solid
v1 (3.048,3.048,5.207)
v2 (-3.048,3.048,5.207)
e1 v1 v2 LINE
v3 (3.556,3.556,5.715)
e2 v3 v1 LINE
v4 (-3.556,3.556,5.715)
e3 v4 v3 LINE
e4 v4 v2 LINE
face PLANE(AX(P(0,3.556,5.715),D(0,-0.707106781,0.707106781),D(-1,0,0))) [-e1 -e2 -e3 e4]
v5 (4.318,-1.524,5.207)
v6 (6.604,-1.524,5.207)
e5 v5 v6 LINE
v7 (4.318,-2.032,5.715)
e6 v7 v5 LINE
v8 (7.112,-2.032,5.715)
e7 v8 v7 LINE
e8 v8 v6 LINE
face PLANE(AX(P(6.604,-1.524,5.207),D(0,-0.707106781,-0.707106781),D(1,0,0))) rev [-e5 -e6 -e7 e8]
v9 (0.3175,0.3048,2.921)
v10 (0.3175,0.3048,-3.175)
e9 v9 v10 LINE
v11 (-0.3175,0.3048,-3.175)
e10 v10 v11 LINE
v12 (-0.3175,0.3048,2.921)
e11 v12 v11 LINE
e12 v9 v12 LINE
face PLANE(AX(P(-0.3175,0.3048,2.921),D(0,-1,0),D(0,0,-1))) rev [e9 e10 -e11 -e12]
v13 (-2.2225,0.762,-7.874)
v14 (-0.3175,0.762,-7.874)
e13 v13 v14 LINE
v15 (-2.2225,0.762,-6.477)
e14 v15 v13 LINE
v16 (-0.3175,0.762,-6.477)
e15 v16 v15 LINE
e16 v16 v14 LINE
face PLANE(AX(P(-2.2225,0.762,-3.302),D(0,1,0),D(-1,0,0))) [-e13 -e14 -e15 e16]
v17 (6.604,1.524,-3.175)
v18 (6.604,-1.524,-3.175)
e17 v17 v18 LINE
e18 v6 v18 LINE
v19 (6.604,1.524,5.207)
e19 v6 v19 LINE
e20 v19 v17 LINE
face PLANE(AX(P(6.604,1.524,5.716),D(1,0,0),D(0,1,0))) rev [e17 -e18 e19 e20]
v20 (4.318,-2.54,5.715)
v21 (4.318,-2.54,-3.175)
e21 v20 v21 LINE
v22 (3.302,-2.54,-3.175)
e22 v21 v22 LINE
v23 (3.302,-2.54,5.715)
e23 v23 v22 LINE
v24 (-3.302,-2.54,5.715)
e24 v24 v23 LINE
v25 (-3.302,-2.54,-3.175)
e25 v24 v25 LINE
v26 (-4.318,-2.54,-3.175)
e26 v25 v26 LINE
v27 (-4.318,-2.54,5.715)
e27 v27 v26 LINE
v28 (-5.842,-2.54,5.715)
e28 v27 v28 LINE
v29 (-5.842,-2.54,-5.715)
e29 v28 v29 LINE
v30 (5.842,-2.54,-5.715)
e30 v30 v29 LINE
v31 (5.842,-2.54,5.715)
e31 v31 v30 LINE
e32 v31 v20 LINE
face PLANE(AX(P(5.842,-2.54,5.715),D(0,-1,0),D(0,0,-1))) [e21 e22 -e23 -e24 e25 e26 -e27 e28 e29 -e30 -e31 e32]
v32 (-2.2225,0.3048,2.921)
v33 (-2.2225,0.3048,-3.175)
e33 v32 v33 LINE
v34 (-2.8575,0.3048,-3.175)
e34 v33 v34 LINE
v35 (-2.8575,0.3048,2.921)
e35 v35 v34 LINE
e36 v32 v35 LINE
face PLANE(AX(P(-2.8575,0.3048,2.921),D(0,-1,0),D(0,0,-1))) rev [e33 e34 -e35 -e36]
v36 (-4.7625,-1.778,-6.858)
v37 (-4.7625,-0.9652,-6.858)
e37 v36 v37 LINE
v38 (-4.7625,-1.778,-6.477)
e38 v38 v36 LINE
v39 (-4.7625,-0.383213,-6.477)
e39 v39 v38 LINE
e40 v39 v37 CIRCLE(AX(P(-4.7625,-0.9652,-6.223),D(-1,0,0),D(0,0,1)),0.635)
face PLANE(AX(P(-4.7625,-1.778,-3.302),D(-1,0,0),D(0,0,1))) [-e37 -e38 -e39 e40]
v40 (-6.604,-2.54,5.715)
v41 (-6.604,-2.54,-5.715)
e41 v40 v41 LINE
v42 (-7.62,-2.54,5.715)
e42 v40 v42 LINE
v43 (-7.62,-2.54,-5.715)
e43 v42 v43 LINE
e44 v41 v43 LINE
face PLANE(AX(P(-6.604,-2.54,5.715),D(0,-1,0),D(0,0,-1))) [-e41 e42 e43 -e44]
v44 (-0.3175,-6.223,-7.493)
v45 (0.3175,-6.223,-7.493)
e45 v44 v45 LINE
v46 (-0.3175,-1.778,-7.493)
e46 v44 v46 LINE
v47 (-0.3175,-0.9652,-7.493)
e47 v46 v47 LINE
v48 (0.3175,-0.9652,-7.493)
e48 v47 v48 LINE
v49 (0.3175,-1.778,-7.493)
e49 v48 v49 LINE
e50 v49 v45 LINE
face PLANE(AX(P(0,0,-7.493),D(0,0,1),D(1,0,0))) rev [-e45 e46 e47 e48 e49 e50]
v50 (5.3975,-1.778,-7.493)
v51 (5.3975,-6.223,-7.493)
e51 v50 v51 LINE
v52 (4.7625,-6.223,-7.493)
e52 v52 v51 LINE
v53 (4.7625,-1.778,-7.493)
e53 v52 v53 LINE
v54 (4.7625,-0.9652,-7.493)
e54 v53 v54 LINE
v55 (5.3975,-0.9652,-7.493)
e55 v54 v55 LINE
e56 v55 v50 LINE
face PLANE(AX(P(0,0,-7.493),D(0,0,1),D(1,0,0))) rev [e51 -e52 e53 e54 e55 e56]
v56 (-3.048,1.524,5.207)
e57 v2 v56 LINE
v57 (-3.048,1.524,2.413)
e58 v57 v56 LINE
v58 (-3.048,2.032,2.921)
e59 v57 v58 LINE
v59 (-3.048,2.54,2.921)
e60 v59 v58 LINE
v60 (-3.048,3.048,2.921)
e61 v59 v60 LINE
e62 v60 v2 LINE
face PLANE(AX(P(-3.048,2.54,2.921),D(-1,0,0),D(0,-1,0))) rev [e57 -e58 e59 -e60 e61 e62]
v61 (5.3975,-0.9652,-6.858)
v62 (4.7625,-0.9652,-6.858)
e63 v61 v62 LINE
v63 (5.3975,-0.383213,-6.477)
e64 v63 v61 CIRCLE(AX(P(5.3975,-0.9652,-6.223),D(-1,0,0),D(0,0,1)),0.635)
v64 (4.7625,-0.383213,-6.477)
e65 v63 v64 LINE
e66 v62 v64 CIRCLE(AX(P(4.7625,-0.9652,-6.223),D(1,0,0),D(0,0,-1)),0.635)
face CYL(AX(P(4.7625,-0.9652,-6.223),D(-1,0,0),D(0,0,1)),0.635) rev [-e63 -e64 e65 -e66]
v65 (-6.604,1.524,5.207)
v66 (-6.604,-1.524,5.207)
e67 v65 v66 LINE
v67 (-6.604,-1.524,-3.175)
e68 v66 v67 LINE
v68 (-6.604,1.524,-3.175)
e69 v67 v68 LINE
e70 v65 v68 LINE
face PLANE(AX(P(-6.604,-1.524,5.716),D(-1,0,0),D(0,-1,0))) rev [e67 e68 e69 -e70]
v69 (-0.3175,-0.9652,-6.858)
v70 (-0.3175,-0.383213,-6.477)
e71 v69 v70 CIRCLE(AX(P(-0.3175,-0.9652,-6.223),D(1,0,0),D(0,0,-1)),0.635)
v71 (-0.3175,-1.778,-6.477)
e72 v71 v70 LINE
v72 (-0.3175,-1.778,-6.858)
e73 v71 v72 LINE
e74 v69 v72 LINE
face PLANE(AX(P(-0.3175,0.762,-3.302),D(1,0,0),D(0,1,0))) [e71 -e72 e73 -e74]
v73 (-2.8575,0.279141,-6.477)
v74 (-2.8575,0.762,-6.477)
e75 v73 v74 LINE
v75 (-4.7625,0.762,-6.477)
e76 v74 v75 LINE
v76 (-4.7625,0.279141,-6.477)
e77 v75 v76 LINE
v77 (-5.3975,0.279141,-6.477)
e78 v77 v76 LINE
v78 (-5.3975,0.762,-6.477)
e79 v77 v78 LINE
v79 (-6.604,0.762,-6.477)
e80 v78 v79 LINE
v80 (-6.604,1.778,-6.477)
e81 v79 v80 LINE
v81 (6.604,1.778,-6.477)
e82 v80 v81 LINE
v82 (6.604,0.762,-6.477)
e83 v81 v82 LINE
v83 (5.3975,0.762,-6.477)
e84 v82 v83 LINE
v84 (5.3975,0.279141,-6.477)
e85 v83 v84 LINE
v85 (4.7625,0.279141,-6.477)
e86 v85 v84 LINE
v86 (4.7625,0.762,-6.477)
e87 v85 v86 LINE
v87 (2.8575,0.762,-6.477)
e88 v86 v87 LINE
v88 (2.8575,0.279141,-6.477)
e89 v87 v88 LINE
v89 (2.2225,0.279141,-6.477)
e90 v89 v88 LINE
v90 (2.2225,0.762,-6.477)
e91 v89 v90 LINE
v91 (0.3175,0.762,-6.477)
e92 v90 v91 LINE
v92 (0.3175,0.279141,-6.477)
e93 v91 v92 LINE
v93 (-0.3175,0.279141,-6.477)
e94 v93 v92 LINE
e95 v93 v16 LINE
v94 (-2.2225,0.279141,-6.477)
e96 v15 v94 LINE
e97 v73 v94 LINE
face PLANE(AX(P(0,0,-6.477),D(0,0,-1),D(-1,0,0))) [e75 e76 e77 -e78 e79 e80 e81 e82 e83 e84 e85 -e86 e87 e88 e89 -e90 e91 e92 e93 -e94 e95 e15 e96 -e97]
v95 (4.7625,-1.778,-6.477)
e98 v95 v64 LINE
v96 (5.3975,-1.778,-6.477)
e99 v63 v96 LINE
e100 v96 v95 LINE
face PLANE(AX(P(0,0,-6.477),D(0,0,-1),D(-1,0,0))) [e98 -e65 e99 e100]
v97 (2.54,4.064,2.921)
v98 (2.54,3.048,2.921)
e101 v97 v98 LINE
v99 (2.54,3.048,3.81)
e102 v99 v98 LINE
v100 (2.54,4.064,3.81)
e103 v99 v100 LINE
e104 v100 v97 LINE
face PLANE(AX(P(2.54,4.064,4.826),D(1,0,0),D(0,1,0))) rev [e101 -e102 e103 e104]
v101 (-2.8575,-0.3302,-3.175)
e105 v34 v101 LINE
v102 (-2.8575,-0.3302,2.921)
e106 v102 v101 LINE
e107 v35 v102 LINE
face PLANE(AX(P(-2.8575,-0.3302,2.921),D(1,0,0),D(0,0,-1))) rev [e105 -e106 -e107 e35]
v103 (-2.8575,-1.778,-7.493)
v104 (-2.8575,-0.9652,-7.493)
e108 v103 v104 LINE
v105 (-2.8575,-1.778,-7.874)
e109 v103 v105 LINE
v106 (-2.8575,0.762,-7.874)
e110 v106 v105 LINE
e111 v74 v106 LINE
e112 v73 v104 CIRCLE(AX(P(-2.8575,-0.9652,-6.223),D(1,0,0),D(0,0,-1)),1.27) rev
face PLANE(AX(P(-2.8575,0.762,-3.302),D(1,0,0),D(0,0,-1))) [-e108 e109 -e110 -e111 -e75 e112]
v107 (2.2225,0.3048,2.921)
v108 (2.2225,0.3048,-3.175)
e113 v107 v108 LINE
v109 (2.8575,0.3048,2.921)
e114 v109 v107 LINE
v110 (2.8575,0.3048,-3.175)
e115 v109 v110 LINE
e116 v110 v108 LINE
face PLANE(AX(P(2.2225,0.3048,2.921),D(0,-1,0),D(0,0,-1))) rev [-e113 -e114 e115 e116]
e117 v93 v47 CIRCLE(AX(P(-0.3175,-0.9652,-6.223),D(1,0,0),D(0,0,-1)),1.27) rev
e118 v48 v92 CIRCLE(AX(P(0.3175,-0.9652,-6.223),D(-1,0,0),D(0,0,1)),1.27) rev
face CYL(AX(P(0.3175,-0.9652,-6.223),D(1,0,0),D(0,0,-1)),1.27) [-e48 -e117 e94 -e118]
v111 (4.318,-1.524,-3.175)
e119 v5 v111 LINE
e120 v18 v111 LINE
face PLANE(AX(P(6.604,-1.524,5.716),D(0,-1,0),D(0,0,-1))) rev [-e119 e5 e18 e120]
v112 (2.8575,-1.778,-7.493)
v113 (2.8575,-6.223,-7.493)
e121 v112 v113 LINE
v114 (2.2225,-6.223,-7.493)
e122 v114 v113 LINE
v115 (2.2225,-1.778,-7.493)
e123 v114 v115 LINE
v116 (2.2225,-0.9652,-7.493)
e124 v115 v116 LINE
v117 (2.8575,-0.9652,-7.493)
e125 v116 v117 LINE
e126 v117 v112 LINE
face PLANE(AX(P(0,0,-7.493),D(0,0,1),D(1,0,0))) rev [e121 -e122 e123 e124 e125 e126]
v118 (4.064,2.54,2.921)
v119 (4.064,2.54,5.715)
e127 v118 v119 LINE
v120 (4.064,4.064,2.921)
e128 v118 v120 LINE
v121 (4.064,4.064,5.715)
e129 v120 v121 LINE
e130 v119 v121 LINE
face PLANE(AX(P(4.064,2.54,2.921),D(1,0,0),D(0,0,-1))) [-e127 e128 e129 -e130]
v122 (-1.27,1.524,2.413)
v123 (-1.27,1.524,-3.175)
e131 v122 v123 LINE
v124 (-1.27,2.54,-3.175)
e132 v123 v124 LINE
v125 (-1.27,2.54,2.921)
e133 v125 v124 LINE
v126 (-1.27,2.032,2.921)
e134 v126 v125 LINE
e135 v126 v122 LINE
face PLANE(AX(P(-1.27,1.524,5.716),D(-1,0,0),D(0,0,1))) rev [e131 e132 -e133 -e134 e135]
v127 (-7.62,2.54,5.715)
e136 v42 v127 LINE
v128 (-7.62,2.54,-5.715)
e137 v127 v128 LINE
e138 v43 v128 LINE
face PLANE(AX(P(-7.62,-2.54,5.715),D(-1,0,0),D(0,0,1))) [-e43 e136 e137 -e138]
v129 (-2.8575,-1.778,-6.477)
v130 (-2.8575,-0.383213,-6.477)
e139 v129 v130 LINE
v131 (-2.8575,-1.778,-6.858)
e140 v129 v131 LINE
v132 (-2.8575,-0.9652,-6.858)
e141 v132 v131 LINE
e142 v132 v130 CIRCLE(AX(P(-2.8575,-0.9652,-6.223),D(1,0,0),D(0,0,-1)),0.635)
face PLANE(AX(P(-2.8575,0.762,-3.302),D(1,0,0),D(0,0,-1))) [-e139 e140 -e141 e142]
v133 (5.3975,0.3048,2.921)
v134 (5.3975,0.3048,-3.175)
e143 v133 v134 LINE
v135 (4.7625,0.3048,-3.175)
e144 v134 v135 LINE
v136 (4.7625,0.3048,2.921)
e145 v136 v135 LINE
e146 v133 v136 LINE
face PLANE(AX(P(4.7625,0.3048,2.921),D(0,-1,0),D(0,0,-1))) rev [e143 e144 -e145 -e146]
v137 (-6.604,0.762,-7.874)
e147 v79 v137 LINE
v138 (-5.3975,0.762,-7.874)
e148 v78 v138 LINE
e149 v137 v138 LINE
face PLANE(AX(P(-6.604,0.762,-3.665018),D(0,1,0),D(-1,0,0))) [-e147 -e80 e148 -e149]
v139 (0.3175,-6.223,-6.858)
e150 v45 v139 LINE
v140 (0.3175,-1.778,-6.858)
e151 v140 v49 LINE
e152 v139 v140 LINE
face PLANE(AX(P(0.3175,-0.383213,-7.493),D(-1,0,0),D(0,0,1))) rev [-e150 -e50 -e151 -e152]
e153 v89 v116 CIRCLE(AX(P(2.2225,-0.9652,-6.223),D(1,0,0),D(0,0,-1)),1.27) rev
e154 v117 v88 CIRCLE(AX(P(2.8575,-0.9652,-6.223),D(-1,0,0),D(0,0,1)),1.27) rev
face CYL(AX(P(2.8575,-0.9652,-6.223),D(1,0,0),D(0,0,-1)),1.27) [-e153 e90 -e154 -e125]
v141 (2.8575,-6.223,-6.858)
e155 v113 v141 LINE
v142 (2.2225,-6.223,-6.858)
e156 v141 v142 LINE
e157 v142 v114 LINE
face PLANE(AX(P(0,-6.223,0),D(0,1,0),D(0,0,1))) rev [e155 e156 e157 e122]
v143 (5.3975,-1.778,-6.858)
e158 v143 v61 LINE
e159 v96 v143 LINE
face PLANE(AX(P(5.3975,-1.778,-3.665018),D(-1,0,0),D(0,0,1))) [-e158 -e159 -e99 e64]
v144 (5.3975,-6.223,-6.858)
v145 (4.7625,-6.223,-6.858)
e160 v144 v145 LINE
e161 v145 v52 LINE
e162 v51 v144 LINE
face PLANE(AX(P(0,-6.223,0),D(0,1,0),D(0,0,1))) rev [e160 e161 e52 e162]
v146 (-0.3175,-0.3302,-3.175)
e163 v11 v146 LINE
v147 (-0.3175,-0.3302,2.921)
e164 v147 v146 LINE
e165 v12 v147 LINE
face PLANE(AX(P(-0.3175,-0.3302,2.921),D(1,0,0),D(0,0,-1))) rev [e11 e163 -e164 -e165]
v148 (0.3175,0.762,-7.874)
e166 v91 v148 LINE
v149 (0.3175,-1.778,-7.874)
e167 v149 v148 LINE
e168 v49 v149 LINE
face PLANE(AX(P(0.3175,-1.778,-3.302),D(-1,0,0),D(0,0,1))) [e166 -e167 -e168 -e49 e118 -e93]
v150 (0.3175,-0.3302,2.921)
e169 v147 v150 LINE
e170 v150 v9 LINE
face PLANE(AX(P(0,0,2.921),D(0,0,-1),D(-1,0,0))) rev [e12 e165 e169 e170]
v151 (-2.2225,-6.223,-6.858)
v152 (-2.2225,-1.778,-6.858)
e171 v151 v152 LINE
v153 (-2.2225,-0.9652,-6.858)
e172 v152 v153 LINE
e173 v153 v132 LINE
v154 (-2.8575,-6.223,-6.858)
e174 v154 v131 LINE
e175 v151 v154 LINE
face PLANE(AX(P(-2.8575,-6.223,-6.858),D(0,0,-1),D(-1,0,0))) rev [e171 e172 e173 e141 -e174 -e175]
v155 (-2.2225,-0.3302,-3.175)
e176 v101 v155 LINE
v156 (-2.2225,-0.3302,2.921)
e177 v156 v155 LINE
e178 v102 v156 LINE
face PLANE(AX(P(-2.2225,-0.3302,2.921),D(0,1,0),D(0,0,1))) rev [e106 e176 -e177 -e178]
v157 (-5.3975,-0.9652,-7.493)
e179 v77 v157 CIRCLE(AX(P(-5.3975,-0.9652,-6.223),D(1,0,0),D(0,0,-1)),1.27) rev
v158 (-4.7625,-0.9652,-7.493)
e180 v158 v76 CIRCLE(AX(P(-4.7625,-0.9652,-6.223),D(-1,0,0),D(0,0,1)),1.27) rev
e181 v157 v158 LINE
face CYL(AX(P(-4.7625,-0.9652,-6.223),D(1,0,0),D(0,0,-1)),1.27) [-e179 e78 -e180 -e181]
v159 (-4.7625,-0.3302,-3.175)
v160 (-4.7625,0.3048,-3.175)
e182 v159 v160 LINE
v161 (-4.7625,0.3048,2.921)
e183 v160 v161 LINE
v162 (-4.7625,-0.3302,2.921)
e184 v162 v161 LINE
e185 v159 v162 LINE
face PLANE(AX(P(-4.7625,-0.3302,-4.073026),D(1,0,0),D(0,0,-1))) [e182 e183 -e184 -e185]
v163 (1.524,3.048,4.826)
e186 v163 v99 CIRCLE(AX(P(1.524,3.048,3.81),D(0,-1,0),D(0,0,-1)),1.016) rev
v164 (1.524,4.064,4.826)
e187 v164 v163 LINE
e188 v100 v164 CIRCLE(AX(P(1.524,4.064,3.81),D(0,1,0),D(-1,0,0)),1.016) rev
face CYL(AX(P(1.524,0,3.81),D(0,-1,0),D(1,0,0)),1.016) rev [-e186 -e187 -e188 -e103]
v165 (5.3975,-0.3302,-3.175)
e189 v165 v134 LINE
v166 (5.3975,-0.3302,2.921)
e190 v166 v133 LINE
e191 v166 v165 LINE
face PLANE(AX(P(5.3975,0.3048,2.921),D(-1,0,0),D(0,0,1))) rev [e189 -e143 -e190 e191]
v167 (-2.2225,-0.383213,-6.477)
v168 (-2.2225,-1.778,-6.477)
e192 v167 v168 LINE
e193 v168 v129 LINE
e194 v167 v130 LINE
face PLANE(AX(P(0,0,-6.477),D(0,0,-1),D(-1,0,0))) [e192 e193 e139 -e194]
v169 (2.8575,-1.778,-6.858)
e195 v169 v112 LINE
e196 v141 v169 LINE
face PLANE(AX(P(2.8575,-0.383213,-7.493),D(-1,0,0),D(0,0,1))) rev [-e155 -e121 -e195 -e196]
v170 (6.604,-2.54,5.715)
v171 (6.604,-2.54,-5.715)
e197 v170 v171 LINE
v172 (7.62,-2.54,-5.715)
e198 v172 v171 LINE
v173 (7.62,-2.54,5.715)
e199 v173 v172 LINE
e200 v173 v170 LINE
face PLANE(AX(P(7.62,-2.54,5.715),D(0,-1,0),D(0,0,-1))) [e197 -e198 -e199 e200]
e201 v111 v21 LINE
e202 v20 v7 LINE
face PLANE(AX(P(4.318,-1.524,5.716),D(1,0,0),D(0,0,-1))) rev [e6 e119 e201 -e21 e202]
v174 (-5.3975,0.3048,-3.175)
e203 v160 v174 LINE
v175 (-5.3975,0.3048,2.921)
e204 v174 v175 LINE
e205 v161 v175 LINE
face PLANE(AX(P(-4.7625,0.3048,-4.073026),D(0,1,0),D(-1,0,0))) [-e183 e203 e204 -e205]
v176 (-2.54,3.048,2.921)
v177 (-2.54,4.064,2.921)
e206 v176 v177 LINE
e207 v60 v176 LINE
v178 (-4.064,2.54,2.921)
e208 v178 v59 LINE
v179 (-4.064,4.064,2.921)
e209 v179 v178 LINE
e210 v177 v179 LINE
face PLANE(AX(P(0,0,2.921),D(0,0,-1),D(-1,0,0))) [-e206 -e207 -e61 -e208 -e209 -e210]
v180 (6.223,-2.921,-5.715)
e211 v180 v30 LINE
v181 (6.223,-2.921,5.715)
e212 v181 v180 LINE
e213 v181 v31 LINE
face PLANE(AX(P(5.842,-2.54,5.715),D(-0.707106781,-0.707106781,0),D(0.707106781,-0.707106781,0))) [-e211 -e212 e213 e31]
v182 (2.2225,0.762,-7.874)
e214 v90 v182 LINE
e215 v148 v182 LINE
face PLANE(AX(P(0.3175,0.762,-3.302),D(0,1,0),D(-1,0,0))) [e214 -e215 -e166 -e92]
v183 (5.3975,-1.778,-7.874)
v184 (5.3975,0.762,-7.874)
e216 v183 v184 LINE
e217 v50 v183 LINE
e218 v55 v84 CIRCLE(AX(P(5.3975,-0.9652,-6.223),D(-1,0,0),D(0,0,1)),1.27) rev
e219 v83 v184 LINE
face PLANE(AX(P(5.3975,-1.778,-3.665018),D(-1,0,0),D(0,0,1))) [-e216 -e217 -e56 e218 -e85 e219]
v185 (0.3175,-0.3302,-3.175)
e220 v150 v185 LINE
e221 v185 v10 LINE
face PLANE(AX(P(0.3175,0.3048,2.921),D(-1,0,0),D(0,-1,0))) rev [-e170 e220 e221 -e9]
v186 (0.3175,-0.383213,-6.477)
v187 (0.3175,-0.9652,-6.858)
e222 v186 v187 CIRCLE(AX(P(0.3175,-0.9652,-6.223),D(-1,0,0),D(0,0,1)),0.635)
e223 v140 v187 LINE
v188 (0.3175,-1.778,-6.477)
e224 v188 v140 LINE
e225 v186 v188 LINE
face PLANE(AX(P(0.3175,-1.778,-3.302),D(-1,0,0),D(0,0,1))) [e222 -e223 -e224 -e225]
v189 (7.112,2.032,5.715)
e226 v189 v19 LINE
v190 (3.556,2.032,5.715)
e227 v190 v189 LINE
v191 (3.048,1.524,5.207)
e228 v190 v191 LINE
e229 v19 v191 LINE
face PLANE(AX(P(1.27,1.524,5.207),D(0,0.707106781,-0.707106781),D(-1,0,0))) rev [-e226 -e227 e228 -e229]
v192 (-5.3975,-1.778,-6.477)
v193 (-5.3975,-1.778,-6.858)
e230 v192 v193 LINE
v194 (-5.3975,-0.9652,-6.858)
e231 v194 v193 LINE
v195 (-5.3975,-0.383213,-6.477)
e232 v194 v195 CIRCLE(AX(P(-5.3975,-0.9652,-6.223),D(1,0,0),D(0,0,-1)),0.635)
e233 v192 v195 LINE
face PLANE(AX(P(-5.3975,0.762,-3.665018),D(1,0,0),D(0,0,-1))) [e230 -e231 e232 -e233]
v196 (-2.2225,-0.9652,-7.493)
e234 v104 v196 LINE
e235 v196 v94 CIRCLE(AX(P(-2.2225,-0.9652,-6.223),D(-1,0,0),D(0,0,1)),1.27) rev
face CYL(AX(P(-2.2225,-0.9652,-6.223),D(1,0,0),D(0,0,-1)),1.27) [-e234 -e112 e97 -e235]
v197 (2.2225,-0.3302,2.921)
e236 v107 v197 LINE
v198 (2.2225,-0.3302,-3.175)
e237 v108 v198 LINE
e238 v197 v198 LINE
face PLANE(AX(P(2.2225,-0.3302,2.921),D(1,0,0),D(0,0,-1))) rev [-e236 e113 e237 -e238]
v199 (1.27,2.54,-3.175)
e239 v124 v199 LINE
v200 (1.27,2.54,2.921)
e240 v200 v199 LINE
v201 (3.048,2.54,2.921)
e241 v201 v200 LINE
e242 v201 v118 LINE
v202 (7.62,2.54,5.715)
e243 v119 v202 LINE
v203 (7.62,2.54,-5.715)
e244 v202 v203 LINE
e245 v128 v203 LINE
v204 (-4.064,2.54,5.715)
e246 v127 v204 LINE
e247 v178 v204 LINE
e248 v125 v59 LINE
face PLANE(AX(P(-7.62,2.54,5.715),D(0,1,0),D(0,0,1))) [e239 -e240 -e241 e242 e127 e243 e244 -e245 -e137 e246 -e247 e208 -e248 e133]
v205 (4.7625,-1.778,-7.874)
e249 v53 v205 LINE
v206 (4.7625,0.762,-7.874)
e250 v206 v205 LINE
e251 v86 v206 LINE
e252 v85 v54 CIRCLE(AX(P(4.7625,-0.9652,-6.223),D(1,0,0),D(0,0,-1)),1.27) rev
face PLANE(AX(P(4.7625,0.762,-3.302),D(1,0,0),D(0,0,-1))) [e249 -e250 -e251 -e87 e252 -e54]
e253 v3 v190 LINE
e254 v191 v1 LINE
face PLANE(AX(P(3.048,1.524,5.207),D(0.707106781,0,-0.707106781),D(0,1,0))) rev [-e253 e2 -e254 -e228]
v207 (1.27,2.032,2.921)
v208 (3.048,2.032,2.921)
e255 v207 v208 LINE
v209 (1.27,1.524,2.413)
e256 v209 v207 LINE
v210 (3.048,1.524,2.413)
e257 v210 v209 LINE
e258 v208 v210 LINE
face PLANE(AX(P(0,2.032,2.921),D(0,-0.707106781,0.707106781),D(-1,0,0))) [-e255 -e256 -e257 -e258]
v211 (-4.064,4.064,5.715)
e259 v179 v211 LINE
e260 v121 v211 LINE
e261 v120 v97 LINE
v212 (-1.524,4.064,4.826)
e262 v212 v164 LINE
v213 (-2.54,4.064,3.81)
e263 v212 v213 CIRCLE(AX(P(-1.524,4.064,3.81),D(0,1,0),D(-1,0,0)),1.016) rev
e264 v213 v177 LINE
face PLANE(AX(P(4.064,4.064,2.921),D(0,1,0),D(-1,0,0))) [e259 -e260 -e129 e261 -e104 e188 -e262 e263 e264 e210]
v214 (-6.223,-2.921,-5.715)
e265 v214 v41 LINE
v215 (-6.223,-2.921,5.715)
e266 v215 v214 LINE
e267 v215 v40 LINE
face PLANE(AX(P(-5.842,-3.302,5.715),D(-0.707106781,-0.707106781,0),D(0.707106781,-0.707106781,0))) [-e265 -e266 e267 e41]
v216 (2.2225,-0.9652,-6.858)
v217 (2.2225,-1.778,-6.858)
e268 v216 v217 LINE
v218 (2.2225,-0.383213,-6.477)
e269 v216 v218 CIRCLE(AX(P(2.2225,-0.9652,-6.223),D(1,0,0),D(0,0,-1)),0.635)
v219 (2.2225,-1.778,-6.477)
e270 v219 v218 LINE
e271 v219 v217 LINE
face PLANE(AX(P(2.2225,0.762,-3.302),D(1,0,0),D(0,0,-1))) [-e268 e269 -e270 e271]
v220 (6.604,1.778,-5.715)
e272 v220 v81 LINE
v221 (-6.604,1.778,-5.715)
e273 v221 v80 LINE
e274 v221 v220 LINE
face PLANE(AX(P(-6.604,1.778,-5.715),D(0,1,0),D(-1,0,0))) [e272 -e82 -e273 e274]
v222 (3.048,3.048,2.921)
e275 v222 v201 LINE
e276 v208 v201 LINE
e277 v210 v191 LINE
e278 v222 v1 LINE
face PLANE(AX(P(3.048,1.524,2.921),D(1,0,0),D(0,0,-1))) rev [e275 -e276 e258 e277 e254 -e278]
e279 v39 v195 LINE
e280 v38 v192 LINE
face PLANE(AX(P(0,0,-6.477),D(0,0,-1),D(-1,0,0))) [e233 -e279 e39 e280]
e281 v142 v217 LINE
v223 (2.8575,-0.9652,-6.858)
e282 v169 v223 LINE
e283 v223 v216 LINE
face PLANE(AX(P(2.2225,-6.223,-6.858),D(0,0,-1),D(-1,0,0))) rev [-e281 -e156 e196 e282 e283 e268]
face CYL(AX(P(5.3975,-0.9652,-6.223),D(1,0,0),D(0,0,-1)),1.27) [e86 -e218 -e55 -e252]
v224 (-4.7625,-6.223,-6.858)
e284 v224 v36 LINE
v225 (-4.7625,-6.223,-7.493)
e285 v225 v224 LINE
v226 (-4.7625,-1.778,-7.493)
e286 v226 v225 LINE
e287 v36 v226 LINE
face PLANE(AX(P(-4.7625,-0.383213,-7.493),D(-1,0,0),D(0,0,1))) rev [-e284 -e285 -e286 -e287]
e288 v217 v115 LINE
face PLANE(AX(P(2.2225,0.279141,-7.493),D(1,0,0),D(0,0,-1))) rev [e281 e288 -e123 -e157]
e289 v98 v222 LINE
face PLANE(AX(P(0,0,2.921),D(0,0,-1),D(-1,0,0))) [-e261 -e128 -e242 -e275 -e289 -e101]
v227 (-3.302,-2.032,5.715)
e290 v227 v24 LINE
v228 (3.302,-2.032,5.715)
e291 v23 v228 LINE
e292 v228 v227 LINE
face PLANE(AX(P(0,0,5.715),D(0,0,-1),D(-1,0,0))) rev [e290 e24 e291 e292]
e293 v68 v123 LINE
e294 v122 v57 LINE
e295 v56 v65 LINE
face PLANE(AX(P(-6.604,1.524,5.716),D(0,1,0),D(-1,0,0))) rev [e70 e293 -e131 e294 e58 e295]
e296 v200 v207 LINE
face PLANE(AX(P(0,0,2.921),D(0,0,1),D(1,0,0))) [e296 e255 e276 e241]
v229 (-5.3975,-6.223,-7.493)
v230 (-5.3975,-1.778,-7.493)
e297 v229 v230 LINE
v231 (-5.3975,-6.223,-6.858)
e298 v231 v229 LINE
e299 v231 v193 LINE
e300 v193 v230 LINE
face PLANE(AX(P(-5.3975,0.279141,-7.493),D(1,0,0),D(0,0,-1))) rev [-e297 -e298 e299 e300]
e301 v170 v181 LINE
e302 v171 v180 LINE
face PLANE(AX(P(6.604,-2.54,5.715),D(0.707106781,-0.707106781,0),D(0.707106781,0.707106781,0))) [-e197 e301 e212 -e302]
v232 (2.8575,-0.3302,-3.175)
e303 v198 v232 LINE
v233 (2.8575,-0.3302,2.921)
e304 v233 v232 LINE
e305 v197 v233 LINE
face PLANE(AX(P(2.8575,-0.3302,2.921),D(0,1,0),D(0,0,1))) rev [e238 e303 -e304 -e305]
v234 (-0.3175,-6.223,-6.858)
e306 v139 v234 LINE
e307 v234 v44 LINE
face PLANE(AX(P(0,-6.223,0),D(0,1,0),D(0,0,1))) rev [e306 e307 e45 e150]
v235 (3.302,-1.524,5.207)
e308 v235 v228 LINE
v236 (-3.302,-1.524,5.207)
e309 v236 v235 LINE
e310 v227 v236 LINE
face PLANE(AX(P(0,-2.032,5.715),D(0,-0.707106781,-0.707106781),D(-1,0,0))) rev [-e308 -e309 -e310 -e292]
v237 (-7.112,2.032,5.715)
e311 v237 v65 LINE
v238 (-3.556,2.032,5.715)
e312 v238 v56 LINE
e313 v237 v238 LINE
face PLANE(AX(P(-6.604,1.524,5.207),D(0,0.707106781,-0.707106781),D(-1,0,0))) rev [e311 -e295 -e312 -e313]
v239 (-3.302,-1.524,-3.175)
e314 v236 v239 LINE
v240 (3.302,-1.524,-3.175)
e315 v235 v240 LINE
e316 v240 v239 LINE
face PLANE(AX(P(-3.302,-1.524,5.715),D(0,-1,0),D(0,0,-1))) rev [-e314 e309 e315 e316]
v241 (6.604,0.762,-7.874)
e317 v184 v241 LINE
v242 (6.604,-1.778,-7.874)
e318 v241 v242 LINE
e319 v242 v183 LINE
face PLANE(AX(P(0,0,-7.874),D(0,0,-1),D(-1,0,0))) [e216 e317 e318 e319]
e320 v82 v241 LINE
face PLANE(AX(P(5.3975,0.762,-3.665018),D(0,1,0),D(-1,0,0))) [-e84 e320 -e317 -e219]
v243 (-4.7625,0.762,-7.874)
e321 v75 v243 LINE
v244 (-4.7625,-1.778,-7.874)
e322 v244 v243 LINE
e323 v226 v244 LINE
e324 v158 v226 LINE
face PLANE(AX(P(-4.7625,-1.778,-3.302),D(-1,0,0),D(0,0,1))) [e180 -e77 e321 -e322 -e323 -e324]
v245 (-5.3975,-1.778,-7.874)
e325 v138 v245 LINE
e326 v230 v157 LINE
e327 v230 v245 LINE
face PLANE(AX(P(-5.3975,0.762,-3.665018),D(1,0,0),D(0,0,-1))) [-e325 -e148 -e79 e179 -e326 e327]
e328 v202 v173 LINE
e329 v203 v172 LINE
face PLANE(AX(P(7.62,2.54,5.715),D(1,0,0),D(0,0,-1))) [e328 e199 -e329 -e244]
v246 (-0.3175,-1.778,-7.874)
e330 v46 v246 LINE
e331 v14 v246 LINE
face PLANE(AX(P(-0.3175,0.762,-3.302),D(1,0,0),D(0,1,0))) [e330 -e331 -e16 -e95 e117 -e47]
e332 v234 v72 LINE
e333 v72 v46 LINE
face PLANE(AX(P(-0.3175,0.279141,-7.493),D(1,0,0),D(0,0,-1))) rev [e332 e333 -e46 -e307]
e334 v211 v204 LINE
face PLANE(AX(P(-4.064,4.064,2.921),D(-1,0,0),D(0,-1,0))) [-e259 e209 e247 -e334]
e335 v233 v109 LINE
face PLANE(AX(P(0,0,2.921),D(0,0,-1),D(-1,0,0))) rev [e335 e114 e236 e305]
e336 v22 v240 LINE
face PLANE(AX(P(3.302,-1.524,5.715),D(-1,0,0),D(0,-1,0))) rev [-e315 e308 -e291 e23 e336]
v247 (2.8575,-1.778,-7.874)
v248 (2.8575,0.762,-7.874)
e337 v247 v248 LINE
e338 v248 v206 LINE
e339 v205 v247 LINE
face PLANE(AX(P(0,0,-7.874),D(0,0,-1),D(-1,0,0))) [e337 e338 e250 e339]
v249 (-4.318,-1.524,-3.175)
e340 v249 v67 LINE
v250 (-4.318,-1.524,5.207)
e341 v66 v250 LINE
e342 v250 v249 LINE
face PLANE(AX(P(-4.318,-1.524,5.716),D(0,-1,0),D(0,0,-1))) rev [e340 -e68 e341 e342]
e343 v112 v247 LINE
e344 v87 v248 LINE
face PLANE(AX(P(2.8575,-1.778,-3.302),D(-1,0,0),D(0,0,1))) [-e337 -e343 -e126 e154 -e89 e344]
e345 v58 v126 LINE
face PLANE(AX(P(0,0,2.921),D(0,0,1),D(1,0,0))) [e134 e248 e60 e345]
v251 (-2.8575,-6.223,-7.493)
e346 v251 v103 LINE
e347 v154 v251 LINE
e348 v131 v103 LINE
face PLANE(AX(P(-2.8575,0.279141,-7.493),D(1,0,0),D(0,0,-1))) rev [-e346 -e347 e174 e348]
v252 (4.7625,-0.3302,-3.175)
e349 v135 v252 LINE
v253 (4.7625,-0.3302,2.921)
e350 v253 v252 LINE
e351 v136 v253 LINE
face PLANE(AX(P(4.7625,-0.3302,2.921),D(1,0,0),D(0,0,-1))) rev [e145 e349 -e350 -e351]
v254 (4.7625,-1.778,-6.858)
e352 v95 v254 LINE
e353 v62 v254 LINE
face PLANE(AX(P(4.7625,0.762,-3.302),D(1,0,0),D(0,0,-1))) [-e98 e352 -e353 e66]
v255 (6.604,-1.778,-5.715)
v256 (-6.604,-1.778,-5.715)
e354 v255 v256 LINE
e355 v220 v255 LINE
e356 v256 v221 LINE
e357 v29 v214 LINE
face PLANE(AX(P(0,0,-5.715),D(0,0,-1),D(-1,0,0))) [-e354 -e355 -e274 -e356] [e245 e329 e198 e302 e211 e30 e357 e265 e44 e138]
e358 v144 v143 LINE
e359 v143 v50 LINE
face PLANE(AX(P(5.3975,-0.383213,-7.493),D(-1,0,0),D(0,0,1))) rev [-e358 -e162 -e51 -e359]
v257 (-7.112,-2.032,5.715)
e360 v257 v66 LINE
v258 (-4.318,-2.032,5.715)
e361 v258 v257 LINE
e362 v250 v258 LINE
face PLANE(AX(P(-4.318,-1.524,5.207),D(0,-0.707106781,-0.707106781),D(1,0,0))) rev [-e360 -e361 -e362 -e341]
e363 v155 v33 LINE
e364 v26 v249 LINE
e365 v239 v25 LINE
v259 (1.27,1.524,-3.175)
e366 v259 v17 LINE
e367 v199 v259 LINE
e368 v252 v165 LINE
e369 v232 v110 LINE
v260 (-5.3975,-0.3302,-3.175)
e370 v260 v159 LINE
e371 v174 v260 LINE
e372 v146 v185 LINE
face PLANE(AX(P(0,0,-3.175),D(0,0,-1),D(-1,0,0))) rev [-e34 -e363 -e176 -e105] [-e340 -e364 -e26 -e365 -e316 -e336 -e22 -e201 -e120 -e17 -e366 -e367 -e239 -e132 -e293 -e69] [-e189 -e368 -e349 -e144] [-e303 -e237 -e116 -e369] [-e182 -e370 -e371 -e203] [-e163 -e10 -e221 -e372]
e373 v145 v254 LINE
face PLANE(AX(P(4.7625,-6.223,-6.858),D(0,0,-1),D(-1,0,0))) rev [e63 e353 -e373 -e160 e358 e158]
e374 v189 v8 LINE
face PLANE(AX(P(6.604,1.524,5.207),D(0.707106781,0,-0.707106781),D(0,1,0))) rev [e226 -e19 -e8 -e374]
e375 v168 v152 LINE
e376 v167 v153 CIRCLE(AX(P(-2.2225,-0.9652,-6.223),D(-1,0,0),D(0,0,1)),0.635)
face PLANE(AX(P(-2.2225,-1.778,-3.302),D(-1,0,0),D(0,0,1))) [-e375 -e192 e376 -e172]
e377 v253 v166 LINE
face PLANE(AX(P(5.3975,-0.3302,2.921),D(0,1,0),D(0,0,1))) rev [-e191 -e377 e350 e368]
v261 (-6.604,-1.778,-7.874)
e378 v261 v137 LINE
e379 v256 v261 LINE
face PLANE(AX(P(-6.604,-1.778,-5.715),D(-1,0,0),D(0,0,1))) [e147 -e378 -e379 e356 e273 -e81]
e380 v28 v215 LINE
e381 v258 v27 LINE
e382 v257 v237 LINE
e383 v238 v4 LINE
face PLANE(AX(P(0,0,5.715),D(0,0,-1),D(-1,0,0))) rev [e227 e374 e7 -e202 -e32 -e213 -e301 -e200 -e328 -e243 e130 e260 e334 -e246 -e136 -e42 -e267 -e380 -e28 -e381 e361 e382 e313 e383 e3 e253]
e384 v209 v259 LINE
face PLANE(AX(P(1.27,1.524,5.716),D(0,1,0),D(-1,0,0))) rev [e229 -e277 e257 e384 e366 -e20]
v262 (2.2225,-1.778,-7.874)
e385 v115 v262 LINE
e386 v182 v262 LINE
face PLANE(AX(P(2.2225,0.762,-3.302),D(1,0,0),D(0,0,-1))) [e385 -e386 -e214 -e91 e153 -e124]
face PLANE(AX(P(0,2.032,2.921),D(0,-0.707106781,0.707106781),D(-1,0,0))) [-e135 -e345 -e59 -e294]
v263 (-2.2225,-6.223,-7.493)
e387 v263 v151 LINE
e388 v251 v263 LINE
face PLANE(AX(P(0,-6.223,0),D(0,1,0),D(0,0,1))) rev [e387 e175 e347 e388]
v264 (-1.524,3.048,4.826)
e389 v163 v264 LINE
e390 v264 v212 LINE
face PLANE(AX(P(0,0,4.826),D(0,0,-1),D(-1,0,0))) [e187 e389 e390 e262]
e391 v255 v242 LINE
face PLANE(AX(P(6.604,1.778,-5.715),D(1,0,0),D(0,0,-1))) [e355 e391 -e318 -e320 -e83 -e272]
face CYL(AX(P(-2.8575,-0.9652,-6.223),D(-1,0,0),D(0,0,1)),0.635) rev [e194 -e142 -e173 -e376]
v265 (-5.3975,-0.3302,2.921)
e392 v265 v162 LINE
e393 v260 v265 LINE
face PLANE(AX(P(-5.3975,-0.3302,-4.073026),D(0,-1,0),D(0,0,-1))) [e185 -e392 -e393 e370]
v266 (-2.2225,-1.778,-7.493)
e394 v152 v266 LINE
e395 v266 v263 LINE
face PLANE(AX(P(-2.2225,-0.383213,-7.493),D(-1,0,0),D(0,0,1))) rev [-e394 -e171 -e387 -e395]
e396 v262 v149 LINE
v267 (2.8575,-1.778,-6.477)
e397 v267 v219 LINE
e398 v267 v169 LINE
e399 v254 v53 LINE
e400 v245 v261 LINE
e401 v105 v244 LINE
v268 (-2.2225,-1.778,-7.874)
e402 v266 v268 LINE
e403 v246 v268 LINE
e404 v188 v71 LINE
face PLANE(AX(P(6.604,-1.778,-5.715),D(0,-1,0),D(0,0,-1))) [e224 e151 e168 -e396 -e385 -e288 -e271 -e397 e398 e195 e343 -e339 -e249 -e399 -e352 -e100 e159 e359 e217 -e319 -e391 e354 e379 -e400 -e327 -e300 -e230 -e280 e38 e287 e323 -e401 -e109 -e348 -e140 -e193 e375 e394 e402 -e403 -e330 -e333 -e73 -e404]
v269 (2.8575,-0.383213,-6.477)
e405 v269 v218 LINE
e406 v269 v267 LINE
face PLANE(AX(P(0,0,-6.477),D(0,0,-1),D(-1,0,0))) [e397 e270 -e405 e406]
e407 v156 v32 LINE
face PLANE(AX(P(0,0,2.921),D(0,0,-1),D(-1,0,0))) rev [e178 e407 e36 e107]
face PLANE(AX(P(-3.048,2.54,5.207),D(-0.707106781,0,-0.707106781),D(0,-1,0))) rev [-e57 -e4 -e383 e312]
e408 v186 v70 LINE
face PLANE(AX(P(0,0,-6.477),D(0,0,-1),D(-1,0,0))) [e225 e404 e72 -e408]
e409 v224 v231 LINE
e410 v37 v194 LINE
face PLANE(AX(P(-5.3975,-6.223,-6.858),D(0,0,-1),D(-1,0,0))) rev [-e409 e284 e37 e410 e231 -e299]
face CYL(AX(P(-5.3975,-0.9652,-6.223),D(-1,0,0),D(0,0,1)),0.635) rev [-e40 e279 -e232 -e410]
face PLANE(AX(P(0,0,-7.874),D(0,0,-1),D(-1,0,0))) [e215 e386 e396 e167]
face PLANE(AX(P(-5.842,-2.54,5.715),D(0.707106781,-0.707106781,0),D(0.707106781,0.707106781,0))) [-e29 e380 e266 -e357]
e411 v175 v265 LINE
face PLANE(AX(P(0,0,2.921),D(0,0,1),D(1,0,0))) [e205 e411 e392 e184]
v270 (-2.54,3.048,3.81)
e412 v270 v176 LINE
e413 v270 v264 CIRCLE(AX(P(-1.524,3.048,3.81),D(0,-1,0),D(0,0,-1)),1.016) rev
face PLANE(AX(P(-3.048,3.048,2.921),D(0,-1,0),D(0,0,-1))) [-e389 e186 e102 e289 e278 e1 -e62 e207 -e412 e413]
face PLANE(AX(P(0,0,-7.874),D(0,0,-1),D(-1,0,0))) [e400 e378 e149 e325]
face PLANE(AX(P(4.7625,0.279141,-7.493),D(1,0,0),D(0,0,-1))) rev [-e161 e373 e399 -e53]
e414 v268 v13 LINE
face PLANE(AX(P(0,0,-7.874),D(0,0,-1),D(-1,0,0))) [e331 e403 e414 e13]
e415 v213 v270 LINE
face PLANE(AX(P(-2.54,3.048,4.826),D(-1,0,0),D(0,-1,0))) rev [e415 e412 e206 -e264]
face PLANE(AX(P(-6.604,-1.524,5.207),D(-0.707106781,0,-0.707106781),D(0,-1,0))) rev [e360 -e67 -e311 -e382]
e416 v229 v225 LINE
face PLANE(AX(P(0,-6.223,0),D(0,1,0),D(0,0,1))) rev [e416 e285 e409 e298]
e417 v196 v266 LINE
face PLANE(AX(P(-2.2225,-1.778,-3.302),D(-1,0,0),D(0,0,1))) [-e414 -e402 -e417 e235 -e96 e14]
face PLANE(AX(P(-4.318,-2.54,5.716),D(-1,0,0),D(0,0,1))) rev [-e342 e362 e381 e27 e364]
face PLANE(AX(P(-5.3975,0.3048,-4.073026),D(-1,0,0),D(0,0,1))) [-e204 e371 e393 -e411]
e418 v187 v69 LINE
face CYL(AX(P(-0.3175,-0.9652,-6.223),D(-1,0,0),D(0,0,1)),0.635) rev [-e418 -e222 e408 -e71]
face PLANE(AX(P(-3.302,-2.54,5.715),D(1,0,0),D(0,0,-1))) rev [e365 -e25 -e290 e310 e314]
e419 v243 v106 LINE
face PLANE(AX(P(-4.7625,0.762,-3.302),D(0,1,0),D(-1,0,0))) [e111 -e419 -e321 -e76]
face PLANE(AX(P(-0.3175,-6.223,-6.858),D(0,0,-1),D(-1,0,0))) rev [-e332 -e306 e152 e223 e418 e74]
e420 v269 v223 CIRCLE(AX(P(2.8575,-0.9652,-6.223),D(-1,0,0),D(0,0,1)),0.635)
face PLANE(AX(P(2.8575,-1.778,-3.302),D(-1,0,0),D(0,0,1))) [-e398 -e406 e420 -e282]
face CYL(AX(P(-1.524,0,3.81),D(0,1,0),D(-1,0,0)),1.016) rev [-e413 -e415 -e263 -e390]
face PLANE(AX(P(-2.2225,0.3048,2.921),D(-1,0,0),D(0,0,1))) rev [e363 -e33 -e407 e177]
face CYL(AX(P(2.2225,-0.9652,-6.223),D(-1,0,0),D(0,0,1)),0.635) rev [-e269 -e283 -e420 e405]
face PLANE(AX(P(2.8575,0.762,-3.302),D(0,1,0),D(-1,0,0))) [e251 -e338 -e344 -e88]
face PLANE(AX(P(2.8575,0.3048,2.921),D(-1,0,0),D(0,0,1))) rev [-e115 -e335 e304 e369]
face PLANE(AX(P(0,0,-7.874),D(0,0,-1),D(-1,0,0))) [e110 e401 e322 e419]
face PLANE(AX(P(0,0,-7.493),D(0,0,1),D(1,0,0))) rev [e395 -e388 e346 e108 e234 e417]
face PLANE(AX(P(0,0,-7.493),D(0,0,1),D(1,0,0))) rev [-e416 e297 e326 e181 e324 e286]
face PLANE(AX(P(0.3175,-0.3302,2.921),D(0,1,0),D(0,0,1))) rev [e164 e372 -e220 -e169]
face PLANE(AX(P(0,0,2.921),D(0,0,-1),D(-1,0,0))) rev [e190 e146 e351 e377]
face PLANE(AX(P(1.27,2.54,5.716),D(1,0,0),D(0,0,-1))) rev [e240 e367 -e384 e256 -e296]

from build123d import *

# Parameters (mm, degrees)
SKETCH1_W            = 13.208
SKETCH1_H            = 3.556
BOSS_EXTRUDE1_DEPTH  = 0.762
SKETCH2_W            = 0.635
SKETCH2_H            = 0.662353677
BOSS_EXTRUDE2_DEPTH  = 1.016
SKETCH3_W            = 0.635
SKETCH3_H            = 0.662353677
BOSS_EXTRUDE3_DEPTH  = 1.016
SKETCH4_W            = 0.635
SKETCH4_H            = 0.662353677
BOSS_EXTRUDE4_DEPTH  = 1.016
SKETCH5_W            = 0.635
SKETCH5_H            = 0.662353677
BOSS_EXTRUDE5_DEPTH  = 1.016
SKETCH6_W            = 0.635
SKETCH6_H            = 0.662353677
BOSS_EXTRUDE6_DEPTH  = 1.016
SKETCH7_W            = 0.635
SKETCH7_H            = 0.635
BOSS_EXTRUDE7_DEPTH  = 5.839787113
SKETCH8_W            = 0.635
SKETCH8_H            = 0.635
BOSS_EXTRUDE8_DEPTH  = 5.839787113
SKETCH9_W            = 0.635
SKETCH9_H            = 0.635
BOSS_EXTRUDE9_DEPTH  = 5.839787113
SKETCH10_W           = 0.635
SKETCH10_H           = 0.635
BOSS_EXTRUDE10_DEPTH = 5.839787113
SKETCH11_W           = 0.635
SKETCH11_H           = 0.635
BOSS_EXTRUDE11_DEPTH = 5.839787113
BOSS_EXTRUDE12_DEPTH = 11.43
CUT_EXTRUDE1_REACH   = 15.26
SKETCH14_W           = 1.778
SKETCH14_H           = 1.016
CUT_EXTRUDE2_DEPTH   = 2.793999999
SKETCH15_W           = 1.778
SKETCH15_H           = 1.016
CUT_EXTRUDE3_DEPTH   = 2.794
BOSS_EXTRUDE13_DEPTH = 2.794
SKETCH17_W           = 6.604
SKETCH17_H           = 1.016
BOSS_EXTRUDE14_DEPTH = 8.89
SKETCH18_W           = 5.08
SKETCH18_H           = 1.016
CUT_EXTRUDE4_DEPTH   = 1.905
CHAMFER1_SIZE        = 0.508
CHAMFER2_SIZE        = 0.508
CHAMFER3_SIZE        = 0.508
DRAFT1_ANGLE         = 45
CHAMFER4_SIZE        = 0.508
SKETCH19_W           = 0.635
SKETCH19_H           = 0.635
BOSS_EXTRUDE15_DEPTH = 6.096
SKETCH20_W           = 0.635
SKETCH20_H           = 0.635
BOSS_EXTRUDE16_DEPTH = 6.096
SKETCH21_W           = 0.635
SKETCH21_H           = 0.635
BOSS_EXTRUDE17_DEPTH = 6.096
SKETCH22_W           = 0.635
SKETCH22_H           = 0.635
BOSS_EXTRUDE18_DEPTH = 6.096
SKETCH23_W           = 0.635
SKETCH23_H           = 0.635
BOSS_EXTRUDE19_DEPTH = 6.096
FILLET1_R            = 0.635
FILLET2_R            = 0.635
FILLET3_R            = 0.635
FILLET4_R            = 0.635
FILLET5_R            = 0.635
FILLET6_R            = 1.27
FILLET7_R            = 1.27
FILLET8_R            = 1.27
FILLET9_R            = 1.27
FILLET10_R           = 1.27
SKETCH24_W           = 1.905
SKETCH24_H           = 2.54
BOSS_EXTRUDE20_DEPTH = 1.397
SKETCH25_W           = 1.905
SKETCH25_H           = 2.54
BOSS_EXTRUDE21_DEPTH = 1.397
SKETCH26_W           = 1.905
SKETCH26_H           = 2.54
BOSS_EXTRUDE22_DEPTH = 1.397
SKETCH27_W           = 1.2065
SKETCH27_H           = 2.54
BOSS_EXTRUDE23_DEPTH = 1.397
SKETCH28_W           = 1.905
SKETCH28_H           = 2.54
BOSS_EXTRUDE24_DEPTH = 1.397
SKETCH29_W           = 1.2065
SKETCH29_H           = 2.54
BOSS_EXTRUDE25_DEPTH = 1.397
FILLET11_R           = 1.016
FILLET12_R           = 1.016


with BuildPart() as part:
    # Sketch1 → Boss-Extrude1 (new body)
    with BuildSketch(Plane(origin=(0, 0, -6.477), x_dir=(-1, 0, 0), z_dir=(0, 0, -1))):
        Rectangle(SKETCH1_W, SKETCH1_H)
    extrude(amount=-BOSS_EXTRUDE1_DEPTH)

    # Sketch2 → Boss-Extrude2 (add)
    with BuildSketch(Plane(origin=(0, 0, -6.477), x_dir=(-1, 0, 0), z_dir=(0, 0, -1))):
        with Locations((5.08, -0.052036048)):
            Rectangle(SKETCH2_W, SKETCH2_H)
    extrude(amount=BOSS_EXTRUDE2_DEPTH)

    # Sketch3 → Boss-Extrude3 (add)
    with BuildSketch(Plane(origin=(0, 0, -6.477), x_dir=(-1, 0, 0), z_dir=(0, 0, -1))):
        with Locations((2.54, -0.052036048)):
            Rectangle(SKETCH3_W, SKETCH3_H)
    extrude(amount=BOSS_EXTRUDE3_DEPTH)

    # Sketch4 → Boss-Extrude4 (add)
    with BuildSketch(Plane(origin=(0, 0, -6.477), x_dir=(-1, 0, 0), z_dir=(0, 0, -1))):
        with Locations((0, -0.052036048)):
            Rectangle(SKETCH4_W, SKETCH4_H)
    extrude(amount=BOSS_EXTRUDE4_DEPTH)

    # Sketch5 → Boss-Extrude5 (add)
    with BuildSketch(Plane(origin=(0, 0, -6.477), x_dir=(-1, 0, 0), z_dir=(0, 0, -1))):
        with Locations((-2.54, -0.052036048)):
            Rectangle(SKETCH5_W, SKETCH5_H)
    extrude(amount=BOSS_EXTRUDE5_DEPTH)

    # Sketch6 → Boss-Extrude6 (add)
    with BuildSketch(Plane(origin=(0, 0, -6.477), x_dir=(-1, 0, 0), z_dir=(0, 0, -1))):
        with Locations((-5.08, -0.052036048)):
            Rectangle(SKETCH6_W, SKETCH6_H)
    extrude(amount=BOSS_EXTRUDE6_DEPTH)

    # Sketch7 → Boss-Extrude7 (add)
    with BuildSketch(Plane.XZ.offset(0.383212887)):
        with Locations((5.08, -7.1755)):
            Rectangle(SKETCH7_W, SKETCH7_H)
    extrude(amount=BOSS_EXTRUDE7_DEPTH)

    # Sketch8 → Boss-Extrude8 (add)
    with BuildSketch(Plane.XZ.offset(0.383212887)):
        with Locations((2.54, -7.1755)):
            Rectangle(SKETCH8_W, SKETCH8_H)
    extrude(amount=BOSS_EXTRUDE8_DEPTH)

    # Sketch9 → Boss-Extrude9 (add)
    with BuildSketch(Plane.XZ.offset(0.383212887)):
        with Locations((0, -7.1755)):
            Rectangle(SKETCH9_W, SKETCH9_H)
    extrude(amount=BOSS_EXTRUDE9_DEPTH)

    # Sketch10 → Boss-Extrude10 (add)
    with BuildSketch(Plane.XZ.offset(0.383212887)):
        with Locations((-2.54, -7.1755)):
            Rectangle(SKETCH10_W, SKETCH10_H)
    extrude(amount=BOSS_EXTRUDE10_DEPTH)

    # Sketch11 → Boss-Extrude11 (add)
    with BuildSketch(Plane.XZ.offset(0.383212887)):
        with Locations((-5.08, -7.1755)):
            Rectangle(SKETCH11_W, SKETCH11_H)
    extrude(amount=BOSS_EXTRUDE11_DEPTH)

    # Sketch12 → Boss-Extrude12 (add)
    with BuildSketch(Plane(origin=(0, 0, -5.715), x_dir=(-1, 0, 0), z_dir=(0, 0, -1))):
        Polygon((7.62, 2.54), (-7.62, 2.54), (-7.62, -2.54), (-6.604, -2.54), (-5.842, -3.302), (-5.842, -2.54), (5.842, -2.54), (5.842, -3.302), (6.604, -2.54), (7.62, -2.54), align=None)
    extrude(amount=-BOSS_EXTRUDE12_DEPTH)

    # Sketch13 → Cut-Extrude1 (cut, up to next)
    with BuildSketch(Plane(origin=(0, 0, -3.175), x_dir=(-1, 0, 0), z_dir=(0, 0, -1)), mode=Mode.PRIVATE) as cut_extrude1_sk1:
        Polygon((-4.318, -2.54), (4.318, -2.54), (4.318, -1.524), (6.604, -1.524), (6.604, 1.524), (1.27, 1.524), (1.27, 2.54), (-1.27, 2.54), (-1.27, 1.524), (-6.604, 1.524), (-6.604, -1.524), (-4.318, -1.524), align=None)
    cut_extrude1_tool1 = extrude(cut_extrude1_sk1.sketch, amount=-CUT_EXTRUDE1_REACH, mode=Mode.PRIVATE) & part.part
    add(cut_extrude1_tool1.solids().sort_by_distance((0, -0.24384, -3.175))[0], mode=Mode.SUBTRACT)

    # Sketch14 → Cut-Extrude2 (cut)
    with BuildSketch(Plane.XY.offset(5.715)):
        with Locations((2.159, 2.032)):
            Rectangle(SKETCH14_W, SKETCH14_H)
    extrude(amount=-CUT_EXTRUDE2_DEPTH, mode=Mode.SUBTRACT)

    # Sketch15 → Cut-Extrude3 (cut)
    with BuildSketch(Plane.XY.offset(5.715)):
        with Locations((-2.159, 2.032)):
            Rectangle(SKETCH15_W, SKETCH15_H)
    extrude(amount=-CUT_EXTRUDE3_DEPTH, mode=Mode.SUBTRACT)

    # Sketch16 → Boss-Extrude13 (add)
    with BuildSketch(Plane.XY.offset(5.715)):
        Polygon((-3.048, 3.048), (3.048, 3.048), (3.048, 2.54), (4.064, 2.54), (4.064, 4.064), (-4.064, 4.064), (-4.064, 2.54), (-3.048, 2.54), align=None)
    extrude(amount=-BOSS_EXTRUDE13_DEPTH)

    # Sketch17 → Boss-Extrude14 (add)
    with BuildSketch(Plane.XY.offset(-3.175)):
        with Locations((0, -2.032)):
            Rectangle(SKETCH17_W, SKETCH17_H)
    extrude(amount=BOSS_EXTRUDE14_DEPTH)

    # Sketch18 → Cut-Extrude4 (cut)
    with BuildSketch(Plane(origin=(0, 0, 2.921), x_dir=(-1, 0, 0), z_dir=(0, 0, -1))):
        with Locations((0, 3.556)):
            Rectangle(SKETCH18_W, SKETCH18_H)
    extrude(amount=-CUT_EXTRUDE4_DEPTH, mode=Mode.SUBTRACT)

    # Chamfer1
    chamfer1_edges = [part.edges().sort_by_distance(p)[0] for p in [
        (2.159, 1.524, 2.921000001),
    ]]
    chamfer(chamfer1_edges, length=CHAMFER1_SIZE)

    # Chamfer2
    chamfer2_edges = [part.edges().sort_by_distance(p)[0] for p in [
        (-2.159, 1.524, 2.921),
    ]]
    chamfer(chamfer2_edges, length=CHAMFER2_SIZE)

    # Chamfer3
    chamfer3_edges = [part.edges().sort_by_distance(p)[0] for p in [
        (0, -1.524, 5.715),
    ]]
    chamfer(chamfer3_edges, length=CHAMFER3_SIZE)

    # Draft1
    draft1_faces = [part.faces().sort_by_distance(p)[0] for p in [
        (5.842, -2.921, 0),
        (-5.842, -2.921, 0),
    ]]
    draft(draft1_faces, Plane(origin=(5.842, -2.54, 5.715), x_dir=(0, 0, -1), z_dir=(0, -1, 0)), DRAFT1_ANGLE)

    # Chamfer4
    chamfer4_edges = [part.edges().sort_by_distance(p)[0] for p in [
        (5.461, -1.524, 5.715),
        (6.604, 0, 5.715),
        (4.826, 1.524, 5.715),
        (-6.604, 0, 5.715),
        (-5.461, -1.524, 5.715),
        (3.048, 2.032, 5.715),
        (-4.826, 1.524, 5.715),
        (-3.048, 2.032, 5.715),
        (0, 3.048, 5.715),
    ]]
    chamfer(chamfer4_edges, length=CHAMFER4_SIZE)

    # Sketch19 → Boss-Extrude15 (add)
    with BuildSketch(Plane.XY.offset(-3.175)):
        with Locations((5.08, -0.0127)):
            Rectangle(SKETCH19_W, SKETCH19_H)
    extrude(amount=BOSS_EXTRUDE15_DEPTH)

    # Sketch20 → Boss-Extrude16 (add)
    with BuildSketch(Plane.XY.offset(-3.175)):
        with Locations((2.54, -0.0127)):
            Rectangle(SKETCH20_W, SKETCH20_H)
    extrude(amount=BOSS_EXTRUDE16_DEPTH)

    # Sketch21 → Boss-Extrude17 (add)
    with BuildSketch(Plane.XY.offset(-3.175)):
        with Locations((0, -0.0127)):
            Rectangle(SKETCH21_W, SKETCH21_H)
    extrude(amount=BOSS_EXTRUDE17_DEPTH)

    # Sketch22 → Boss-Extrude18 (add)
    with BuildSketch(Plane.XY.offset(-3.175)):
        with Locations((-2.54, -0.0127)):
            Rectangle(SKETCH22_W, SKETCH22_H)
    extrude(amount=BOSS_EXTRUDE18_DEPTH)

    # Sketch23 → Boss-Extrude19 (add)
    with BuildSketch(Plane.XY.offset(2.921)):
        with Locations((-5.08, -0.0127)):
            Rectangle(SKETCH23_W, SKETCH23_H)
    extrude(amount=-BOSS_EXTRUDE19_DEPTH)

    # Fillet1
    # the kernel refuses this fillet: 0.635 mm, written as the material it adds along each edge
    with BuildSketch(Plane(origin=(-5.3975, -0.383212887, -6.858), x_dir=(0, 0, 1), z_dir=(1, 0, 0))) as fillet1_piece_1:
        with BuildLine():
            CenterArc((0.635, 0.581987113), FILLET1_R, 180, 66.421821522)
            Line((0, 0.581987113), (-0.0127, 0.581987113))
            Line((-0.0127, 0.581987113), (-0.0127, 0))
            Line((-0.0127, 0), (0, -0.0127))
            ThreePointArc((0, -0.0127), (0.1905, -0.0127), (0.37592, -0.011639742))
            Line((0.37592, -0.011639742), (0.381, 0))
        make_face()
    extrude(amount=0.635)

    # Fillet2
    # the kernel refuses this fillet: 0.635 mm, written as the material it adds along each edge
    with BuildSketch(Plane(origin=(-2.8575, -0.383212887, -6.858), x_dir=(0, 0, 1), z_dir=(1, 0, 0))) as fillet2_piece_1:
        with BuildLine():
            CenterArc((0.635, 0.581987113), FILLET2_R, 180, 66.421821522)
            Line((0, 0.581987113), (-0.0127, 0.581987113))
            Line((-0.0127, 0.581987113), (-0.0127, 0))
            Line((-0.0127, 0), (0, -0.0127))
            ThreePointArc((0, -0.0127), (0.1905, -0.0127), (0.37592, -0.011639742))
            Line((0.37592, -0.011639742), (0.381, 0))
        make_face()
    extrude(amount=0.635)

    # Fillet3
    # the kernel refuses this fillet: 0.635 mm, written as the material it adds along each edge
    with BuildSketch(Plane(origin=(-0.3175, -0.383212887, -6.858), x_dir=(0, 0, 1), z_dir=(1, 0, 0))) as fillet3_piece_1:
        with BuildLine():
            CenterArc((0.635, 0.581987113), FILLET3_R, 180, 66.421821522)
            Line((0, 0.581987113), (-0.0127, 0.581987113))
            Line((-0.0127, 0.581987113), (-0.0127, 0))
            Line((-0.0127, 0), (0, -0.0127))
            ThreePointArc((0, -0.0127), (0.1905, -0.0127), (0.37592, -0.011639742))
            Line((0.37592, -0.011639742), (0.381, 0))
        make_face()
    extrude(amount=0.635)

    # Fillet4
    # the kernel refuses this fillet: 0.635 mm, written as the material it adds along each edge
    with BuildSketch(Plane(origin=(2.2225, -0.383212887, -6.858), x_dir=(0, 0, 1), z_dir=(1, 0, 0))) as fillet4_piece_1:
        with BuildLine():
            CenterArc((0.635, 0.581987113), FILLET4_R, 180, 66.421821522)
            Line((0, 0.581987113), (-0.0127, 0.581987113))
            Line((-0.0127, 0.581987113), (-0.0127, 0))
            Line((-0.0127, 0), (0, -0.0127))
            ThreePointArc((0, -0.0127), (0.1905, -0.0127), (0.37592, -0.011639742))
            Line((0.37592, -0.011639742), (0.381, 0))
        make_face()
    extrude(amount=0.635)

    # Fillet5
    # the kernel refuses this fillet: 0.635 mm, written as the material it adds along each edge
    with BuildSketch(Plane(origin=(4.7625, -0.383212887, -6.858), x_dir=(0, 0, 1), z_dir=(1, 0, 0))) as fillet5_piece_1:
        with BuildLine():
            CenterArc((0.635, 0.581987113), FILLET5_R, 180, 66.421821522)
            Line((0, 0.581987113), (-0.0127, 0.581987113))
            Line((-0.0127, 0.581987113), (-0.0127, 0))
            Line((-0.0127, 0), (0, -0.0127))
            ThreePointArc((0, -0.0127), (0.1905, -0.0127), (0.37592, -0.011639742))
            Line((0.37592, -0.011639742), (0.381, 0))
        make_face()
    extrude(amount=0.635)

    # Fillet6
    # the kernel refuses this fillet: 1.27 mm, written as the material it takes off along each edge
    with BuildSketch(Plane(origin=(-4.7625, 0.27914079, -7.493), x_dir=(0, -1.5751835531463075e-12, 1.0), z_dir=(-1, 0, 0))) as fillet6_piece_1:
        with BuildLine():
            CenterArc((1.27, -1.244340789), FILLET6_R, 101.536959033, 78.463040967)
            Line((0, -1.244340789), (0, 0))
            Line((0, 0), (1.016, 0))
        make_face()
    extrude(amount=3.745851973, mode=Mode.SUBTRACT)

    # Fillet7
    # the kernel refuses this fillet: 1.27 mm, written as the material it takes off along each edge
    with BuildSketch(Plane(origin=(-2.2225, 0.27914079, -7.493), x_dir=(0, -1.5751835531463075e-12, 1.0), z_dir=(-1, 0, 0))) as fillet7_piece_1:
        with BuildLine():
            CenterArc((1.27, -1.244340789), FILLET7_R, 101.536959033, 78.463040967)
            Line((0, -1.244340789), (0, 0))
            Line((0, 0), (1.016, 0))
        make_face()
    extrude(amount=3.745851973, mode=Mode.SUBTRACT)

    # Fillet8
    # the kernel refuses this fillet: 1.27 mm, written as the material it takes off along each edge
    with BuildSketch(Plane(origin=(0.3175, 0.27914079, -7.493), x_dir=(0, -1.5751835531463075e-12, 1.0), z_dir=(-1, 0, 0))) as fillet8_piece_1:
        with BuildLine():
            CenterArc((1.27, -1.244340789), FILLET8_R, 101.536959033, 78.463040967)
            Line((0, -1.244340789), (0, 0))
            Line((0, 0), (1.016, 0))
        make_face()
    extrude(amount=3.745851974, mode=Mode.SUBTRACT)

    # Fillet9
    # the kernel refuses this fillet: 1.27 mm, written as the material it takes off along each edge
    with BuildSketch(Plane(origin=(2.8575, 0.27914079, -7.493), x_dir=(0, -1.5751835531463075e-12, 1.0), z_dir=(-1, 0, 0))) as fillet9_piece_1:
        with BuildLine():
            CenterArc((1.27, -1.244340789), FILLET9_R, 101.536959033, 78.463040967)
            Line((0, -1.244340789), (0, 0))
            Line((0, 0), (1.016, 0))
        make_face()
    extrude(amount=3.745851973, mode=Mode.SUBTRACT)

    # Fillet10
    # the kernel refuses this fillet: 1.27 mm, written as the material it takes off along each edge
    with BuildSketch(Plane(origin=(8.508351974, 0.27914079, -7.493), x_dir=(0, -1.5751835531463075e-12, 1.0), z_dir=(-1, 0, 0))) as fillet10_piece_1:
        with BuildLine():
            CenterArc((1.27, -1.244340789), FILLET10_R, 101.536959033, 78.463040967)
            Line((0, -1.244340789), (-0.0254, -1.244340789))
            Line((-0.0254, -1.244340789), (-0.0254, 0))
            Line((-0.0254, 0), (0, 0.0254))
            ThreePointArc((0, 0.0254), (0.508, 0.0254), (1.01092, 0.024886816))
            Line((1.01092, 0.024886816), (1.016, 0))
        make_face()
    extrude(amount=6.856703947, mode=Mode.SUBTRACT)

    # Sketch24 → Boss-Extrude20 (add)
    with BuildSketch(Plane(origin=(0, 0, -7.874), x_dir=(-1, 0, 0), z_dir=(0, 0, -1))):
        with Locations((1.27, -0.508)):
            Rectangle(SKETCH24_W, SKETCH24_H)
    extrude(amount=-BOSS_EXTRUDE20_DEPTH)

    # Sketch25 → Boss-Extrude21 (add)
    with BuildSketch(Plane(origin=(0, 0, -7.874), x_dir=(-1, 0, 0), z_dir=(0, 0, -1))):
        with Locations((-1.27, -0.508)):
            Rectangle(SKETCH25_W, SKETCH25_H)
    extrude(amount=-BOSS_EXTRUDE21_DEPTH)

    # Sketch26 → Boss-Extrude22 (add)
    with BuildSketch(Plane(origin=(0, 0, -7.874), x_dir=(-1, 0, 0), z_dir=(0, 0, -1))):
        with Locations((3.81, -0.508)):
            Rectangle(SKETCH26_W, SKETCH26_H)
    extrude(amount=-BOSS_EXTRUDE22_DEPTH)

    # Sketch27 → Boss-Extrude23 (add)
    with BuildSketch(Plane(origin=(0, 0, -7.874), x_dir=(-1, 0, 0), z_dir=(0, 0, -1))):
        with Locations((6.00075, -0.508)):
            Rectangle(SKETCH27_W, SKETCH27_H)
    extrude(amount=-BOSS_EXTRUDE23_DEPTH)

    # Sketch28 → Boss-Extrude24 (add)
    with BuildSketch(Plane(origin=(0, 0, -7.874), x_dir=(-1, 0, 0), z_dir=(0, 0, -1))):
        with Locations((-3.81, -0.508)):
            Rectangle(SKETCH28_W, SKETCH28_H)
    extrude(amount=-BOSS_EXTRUDE24_DEPTH)

    # Sketch29 → Boss-Extrude25 (add)
    with BuildSketch(Plane(origin=(0, 0, -7.874), x_dir=(-1, 0, 0), z_dir=(0, 0, -1))):
        with Locations((-6.00075, -0.508)):
            Rectangle(SKETCH29_W, SKETCH29_H)
    extrude(amount=-BOSS_EXTRUDE25_DEPTH)

    # Fillet11
    fillet11_edges = [part.edges().sort_by_distance(p)[0] for p in [
        (2.54, 3.556, 4.826),
    ]]
    fillet(fillet11_edges, radius=FILLET11_R)

    # Fillet12
    fillet12_edges = [part.edges().sort_by_distance(p)[0] for p in [
        (-2.54, 3.556, 4.826),
    ]]
    fillet(fillet12_edges, radius=FILLET12_R)


solid = part.part
